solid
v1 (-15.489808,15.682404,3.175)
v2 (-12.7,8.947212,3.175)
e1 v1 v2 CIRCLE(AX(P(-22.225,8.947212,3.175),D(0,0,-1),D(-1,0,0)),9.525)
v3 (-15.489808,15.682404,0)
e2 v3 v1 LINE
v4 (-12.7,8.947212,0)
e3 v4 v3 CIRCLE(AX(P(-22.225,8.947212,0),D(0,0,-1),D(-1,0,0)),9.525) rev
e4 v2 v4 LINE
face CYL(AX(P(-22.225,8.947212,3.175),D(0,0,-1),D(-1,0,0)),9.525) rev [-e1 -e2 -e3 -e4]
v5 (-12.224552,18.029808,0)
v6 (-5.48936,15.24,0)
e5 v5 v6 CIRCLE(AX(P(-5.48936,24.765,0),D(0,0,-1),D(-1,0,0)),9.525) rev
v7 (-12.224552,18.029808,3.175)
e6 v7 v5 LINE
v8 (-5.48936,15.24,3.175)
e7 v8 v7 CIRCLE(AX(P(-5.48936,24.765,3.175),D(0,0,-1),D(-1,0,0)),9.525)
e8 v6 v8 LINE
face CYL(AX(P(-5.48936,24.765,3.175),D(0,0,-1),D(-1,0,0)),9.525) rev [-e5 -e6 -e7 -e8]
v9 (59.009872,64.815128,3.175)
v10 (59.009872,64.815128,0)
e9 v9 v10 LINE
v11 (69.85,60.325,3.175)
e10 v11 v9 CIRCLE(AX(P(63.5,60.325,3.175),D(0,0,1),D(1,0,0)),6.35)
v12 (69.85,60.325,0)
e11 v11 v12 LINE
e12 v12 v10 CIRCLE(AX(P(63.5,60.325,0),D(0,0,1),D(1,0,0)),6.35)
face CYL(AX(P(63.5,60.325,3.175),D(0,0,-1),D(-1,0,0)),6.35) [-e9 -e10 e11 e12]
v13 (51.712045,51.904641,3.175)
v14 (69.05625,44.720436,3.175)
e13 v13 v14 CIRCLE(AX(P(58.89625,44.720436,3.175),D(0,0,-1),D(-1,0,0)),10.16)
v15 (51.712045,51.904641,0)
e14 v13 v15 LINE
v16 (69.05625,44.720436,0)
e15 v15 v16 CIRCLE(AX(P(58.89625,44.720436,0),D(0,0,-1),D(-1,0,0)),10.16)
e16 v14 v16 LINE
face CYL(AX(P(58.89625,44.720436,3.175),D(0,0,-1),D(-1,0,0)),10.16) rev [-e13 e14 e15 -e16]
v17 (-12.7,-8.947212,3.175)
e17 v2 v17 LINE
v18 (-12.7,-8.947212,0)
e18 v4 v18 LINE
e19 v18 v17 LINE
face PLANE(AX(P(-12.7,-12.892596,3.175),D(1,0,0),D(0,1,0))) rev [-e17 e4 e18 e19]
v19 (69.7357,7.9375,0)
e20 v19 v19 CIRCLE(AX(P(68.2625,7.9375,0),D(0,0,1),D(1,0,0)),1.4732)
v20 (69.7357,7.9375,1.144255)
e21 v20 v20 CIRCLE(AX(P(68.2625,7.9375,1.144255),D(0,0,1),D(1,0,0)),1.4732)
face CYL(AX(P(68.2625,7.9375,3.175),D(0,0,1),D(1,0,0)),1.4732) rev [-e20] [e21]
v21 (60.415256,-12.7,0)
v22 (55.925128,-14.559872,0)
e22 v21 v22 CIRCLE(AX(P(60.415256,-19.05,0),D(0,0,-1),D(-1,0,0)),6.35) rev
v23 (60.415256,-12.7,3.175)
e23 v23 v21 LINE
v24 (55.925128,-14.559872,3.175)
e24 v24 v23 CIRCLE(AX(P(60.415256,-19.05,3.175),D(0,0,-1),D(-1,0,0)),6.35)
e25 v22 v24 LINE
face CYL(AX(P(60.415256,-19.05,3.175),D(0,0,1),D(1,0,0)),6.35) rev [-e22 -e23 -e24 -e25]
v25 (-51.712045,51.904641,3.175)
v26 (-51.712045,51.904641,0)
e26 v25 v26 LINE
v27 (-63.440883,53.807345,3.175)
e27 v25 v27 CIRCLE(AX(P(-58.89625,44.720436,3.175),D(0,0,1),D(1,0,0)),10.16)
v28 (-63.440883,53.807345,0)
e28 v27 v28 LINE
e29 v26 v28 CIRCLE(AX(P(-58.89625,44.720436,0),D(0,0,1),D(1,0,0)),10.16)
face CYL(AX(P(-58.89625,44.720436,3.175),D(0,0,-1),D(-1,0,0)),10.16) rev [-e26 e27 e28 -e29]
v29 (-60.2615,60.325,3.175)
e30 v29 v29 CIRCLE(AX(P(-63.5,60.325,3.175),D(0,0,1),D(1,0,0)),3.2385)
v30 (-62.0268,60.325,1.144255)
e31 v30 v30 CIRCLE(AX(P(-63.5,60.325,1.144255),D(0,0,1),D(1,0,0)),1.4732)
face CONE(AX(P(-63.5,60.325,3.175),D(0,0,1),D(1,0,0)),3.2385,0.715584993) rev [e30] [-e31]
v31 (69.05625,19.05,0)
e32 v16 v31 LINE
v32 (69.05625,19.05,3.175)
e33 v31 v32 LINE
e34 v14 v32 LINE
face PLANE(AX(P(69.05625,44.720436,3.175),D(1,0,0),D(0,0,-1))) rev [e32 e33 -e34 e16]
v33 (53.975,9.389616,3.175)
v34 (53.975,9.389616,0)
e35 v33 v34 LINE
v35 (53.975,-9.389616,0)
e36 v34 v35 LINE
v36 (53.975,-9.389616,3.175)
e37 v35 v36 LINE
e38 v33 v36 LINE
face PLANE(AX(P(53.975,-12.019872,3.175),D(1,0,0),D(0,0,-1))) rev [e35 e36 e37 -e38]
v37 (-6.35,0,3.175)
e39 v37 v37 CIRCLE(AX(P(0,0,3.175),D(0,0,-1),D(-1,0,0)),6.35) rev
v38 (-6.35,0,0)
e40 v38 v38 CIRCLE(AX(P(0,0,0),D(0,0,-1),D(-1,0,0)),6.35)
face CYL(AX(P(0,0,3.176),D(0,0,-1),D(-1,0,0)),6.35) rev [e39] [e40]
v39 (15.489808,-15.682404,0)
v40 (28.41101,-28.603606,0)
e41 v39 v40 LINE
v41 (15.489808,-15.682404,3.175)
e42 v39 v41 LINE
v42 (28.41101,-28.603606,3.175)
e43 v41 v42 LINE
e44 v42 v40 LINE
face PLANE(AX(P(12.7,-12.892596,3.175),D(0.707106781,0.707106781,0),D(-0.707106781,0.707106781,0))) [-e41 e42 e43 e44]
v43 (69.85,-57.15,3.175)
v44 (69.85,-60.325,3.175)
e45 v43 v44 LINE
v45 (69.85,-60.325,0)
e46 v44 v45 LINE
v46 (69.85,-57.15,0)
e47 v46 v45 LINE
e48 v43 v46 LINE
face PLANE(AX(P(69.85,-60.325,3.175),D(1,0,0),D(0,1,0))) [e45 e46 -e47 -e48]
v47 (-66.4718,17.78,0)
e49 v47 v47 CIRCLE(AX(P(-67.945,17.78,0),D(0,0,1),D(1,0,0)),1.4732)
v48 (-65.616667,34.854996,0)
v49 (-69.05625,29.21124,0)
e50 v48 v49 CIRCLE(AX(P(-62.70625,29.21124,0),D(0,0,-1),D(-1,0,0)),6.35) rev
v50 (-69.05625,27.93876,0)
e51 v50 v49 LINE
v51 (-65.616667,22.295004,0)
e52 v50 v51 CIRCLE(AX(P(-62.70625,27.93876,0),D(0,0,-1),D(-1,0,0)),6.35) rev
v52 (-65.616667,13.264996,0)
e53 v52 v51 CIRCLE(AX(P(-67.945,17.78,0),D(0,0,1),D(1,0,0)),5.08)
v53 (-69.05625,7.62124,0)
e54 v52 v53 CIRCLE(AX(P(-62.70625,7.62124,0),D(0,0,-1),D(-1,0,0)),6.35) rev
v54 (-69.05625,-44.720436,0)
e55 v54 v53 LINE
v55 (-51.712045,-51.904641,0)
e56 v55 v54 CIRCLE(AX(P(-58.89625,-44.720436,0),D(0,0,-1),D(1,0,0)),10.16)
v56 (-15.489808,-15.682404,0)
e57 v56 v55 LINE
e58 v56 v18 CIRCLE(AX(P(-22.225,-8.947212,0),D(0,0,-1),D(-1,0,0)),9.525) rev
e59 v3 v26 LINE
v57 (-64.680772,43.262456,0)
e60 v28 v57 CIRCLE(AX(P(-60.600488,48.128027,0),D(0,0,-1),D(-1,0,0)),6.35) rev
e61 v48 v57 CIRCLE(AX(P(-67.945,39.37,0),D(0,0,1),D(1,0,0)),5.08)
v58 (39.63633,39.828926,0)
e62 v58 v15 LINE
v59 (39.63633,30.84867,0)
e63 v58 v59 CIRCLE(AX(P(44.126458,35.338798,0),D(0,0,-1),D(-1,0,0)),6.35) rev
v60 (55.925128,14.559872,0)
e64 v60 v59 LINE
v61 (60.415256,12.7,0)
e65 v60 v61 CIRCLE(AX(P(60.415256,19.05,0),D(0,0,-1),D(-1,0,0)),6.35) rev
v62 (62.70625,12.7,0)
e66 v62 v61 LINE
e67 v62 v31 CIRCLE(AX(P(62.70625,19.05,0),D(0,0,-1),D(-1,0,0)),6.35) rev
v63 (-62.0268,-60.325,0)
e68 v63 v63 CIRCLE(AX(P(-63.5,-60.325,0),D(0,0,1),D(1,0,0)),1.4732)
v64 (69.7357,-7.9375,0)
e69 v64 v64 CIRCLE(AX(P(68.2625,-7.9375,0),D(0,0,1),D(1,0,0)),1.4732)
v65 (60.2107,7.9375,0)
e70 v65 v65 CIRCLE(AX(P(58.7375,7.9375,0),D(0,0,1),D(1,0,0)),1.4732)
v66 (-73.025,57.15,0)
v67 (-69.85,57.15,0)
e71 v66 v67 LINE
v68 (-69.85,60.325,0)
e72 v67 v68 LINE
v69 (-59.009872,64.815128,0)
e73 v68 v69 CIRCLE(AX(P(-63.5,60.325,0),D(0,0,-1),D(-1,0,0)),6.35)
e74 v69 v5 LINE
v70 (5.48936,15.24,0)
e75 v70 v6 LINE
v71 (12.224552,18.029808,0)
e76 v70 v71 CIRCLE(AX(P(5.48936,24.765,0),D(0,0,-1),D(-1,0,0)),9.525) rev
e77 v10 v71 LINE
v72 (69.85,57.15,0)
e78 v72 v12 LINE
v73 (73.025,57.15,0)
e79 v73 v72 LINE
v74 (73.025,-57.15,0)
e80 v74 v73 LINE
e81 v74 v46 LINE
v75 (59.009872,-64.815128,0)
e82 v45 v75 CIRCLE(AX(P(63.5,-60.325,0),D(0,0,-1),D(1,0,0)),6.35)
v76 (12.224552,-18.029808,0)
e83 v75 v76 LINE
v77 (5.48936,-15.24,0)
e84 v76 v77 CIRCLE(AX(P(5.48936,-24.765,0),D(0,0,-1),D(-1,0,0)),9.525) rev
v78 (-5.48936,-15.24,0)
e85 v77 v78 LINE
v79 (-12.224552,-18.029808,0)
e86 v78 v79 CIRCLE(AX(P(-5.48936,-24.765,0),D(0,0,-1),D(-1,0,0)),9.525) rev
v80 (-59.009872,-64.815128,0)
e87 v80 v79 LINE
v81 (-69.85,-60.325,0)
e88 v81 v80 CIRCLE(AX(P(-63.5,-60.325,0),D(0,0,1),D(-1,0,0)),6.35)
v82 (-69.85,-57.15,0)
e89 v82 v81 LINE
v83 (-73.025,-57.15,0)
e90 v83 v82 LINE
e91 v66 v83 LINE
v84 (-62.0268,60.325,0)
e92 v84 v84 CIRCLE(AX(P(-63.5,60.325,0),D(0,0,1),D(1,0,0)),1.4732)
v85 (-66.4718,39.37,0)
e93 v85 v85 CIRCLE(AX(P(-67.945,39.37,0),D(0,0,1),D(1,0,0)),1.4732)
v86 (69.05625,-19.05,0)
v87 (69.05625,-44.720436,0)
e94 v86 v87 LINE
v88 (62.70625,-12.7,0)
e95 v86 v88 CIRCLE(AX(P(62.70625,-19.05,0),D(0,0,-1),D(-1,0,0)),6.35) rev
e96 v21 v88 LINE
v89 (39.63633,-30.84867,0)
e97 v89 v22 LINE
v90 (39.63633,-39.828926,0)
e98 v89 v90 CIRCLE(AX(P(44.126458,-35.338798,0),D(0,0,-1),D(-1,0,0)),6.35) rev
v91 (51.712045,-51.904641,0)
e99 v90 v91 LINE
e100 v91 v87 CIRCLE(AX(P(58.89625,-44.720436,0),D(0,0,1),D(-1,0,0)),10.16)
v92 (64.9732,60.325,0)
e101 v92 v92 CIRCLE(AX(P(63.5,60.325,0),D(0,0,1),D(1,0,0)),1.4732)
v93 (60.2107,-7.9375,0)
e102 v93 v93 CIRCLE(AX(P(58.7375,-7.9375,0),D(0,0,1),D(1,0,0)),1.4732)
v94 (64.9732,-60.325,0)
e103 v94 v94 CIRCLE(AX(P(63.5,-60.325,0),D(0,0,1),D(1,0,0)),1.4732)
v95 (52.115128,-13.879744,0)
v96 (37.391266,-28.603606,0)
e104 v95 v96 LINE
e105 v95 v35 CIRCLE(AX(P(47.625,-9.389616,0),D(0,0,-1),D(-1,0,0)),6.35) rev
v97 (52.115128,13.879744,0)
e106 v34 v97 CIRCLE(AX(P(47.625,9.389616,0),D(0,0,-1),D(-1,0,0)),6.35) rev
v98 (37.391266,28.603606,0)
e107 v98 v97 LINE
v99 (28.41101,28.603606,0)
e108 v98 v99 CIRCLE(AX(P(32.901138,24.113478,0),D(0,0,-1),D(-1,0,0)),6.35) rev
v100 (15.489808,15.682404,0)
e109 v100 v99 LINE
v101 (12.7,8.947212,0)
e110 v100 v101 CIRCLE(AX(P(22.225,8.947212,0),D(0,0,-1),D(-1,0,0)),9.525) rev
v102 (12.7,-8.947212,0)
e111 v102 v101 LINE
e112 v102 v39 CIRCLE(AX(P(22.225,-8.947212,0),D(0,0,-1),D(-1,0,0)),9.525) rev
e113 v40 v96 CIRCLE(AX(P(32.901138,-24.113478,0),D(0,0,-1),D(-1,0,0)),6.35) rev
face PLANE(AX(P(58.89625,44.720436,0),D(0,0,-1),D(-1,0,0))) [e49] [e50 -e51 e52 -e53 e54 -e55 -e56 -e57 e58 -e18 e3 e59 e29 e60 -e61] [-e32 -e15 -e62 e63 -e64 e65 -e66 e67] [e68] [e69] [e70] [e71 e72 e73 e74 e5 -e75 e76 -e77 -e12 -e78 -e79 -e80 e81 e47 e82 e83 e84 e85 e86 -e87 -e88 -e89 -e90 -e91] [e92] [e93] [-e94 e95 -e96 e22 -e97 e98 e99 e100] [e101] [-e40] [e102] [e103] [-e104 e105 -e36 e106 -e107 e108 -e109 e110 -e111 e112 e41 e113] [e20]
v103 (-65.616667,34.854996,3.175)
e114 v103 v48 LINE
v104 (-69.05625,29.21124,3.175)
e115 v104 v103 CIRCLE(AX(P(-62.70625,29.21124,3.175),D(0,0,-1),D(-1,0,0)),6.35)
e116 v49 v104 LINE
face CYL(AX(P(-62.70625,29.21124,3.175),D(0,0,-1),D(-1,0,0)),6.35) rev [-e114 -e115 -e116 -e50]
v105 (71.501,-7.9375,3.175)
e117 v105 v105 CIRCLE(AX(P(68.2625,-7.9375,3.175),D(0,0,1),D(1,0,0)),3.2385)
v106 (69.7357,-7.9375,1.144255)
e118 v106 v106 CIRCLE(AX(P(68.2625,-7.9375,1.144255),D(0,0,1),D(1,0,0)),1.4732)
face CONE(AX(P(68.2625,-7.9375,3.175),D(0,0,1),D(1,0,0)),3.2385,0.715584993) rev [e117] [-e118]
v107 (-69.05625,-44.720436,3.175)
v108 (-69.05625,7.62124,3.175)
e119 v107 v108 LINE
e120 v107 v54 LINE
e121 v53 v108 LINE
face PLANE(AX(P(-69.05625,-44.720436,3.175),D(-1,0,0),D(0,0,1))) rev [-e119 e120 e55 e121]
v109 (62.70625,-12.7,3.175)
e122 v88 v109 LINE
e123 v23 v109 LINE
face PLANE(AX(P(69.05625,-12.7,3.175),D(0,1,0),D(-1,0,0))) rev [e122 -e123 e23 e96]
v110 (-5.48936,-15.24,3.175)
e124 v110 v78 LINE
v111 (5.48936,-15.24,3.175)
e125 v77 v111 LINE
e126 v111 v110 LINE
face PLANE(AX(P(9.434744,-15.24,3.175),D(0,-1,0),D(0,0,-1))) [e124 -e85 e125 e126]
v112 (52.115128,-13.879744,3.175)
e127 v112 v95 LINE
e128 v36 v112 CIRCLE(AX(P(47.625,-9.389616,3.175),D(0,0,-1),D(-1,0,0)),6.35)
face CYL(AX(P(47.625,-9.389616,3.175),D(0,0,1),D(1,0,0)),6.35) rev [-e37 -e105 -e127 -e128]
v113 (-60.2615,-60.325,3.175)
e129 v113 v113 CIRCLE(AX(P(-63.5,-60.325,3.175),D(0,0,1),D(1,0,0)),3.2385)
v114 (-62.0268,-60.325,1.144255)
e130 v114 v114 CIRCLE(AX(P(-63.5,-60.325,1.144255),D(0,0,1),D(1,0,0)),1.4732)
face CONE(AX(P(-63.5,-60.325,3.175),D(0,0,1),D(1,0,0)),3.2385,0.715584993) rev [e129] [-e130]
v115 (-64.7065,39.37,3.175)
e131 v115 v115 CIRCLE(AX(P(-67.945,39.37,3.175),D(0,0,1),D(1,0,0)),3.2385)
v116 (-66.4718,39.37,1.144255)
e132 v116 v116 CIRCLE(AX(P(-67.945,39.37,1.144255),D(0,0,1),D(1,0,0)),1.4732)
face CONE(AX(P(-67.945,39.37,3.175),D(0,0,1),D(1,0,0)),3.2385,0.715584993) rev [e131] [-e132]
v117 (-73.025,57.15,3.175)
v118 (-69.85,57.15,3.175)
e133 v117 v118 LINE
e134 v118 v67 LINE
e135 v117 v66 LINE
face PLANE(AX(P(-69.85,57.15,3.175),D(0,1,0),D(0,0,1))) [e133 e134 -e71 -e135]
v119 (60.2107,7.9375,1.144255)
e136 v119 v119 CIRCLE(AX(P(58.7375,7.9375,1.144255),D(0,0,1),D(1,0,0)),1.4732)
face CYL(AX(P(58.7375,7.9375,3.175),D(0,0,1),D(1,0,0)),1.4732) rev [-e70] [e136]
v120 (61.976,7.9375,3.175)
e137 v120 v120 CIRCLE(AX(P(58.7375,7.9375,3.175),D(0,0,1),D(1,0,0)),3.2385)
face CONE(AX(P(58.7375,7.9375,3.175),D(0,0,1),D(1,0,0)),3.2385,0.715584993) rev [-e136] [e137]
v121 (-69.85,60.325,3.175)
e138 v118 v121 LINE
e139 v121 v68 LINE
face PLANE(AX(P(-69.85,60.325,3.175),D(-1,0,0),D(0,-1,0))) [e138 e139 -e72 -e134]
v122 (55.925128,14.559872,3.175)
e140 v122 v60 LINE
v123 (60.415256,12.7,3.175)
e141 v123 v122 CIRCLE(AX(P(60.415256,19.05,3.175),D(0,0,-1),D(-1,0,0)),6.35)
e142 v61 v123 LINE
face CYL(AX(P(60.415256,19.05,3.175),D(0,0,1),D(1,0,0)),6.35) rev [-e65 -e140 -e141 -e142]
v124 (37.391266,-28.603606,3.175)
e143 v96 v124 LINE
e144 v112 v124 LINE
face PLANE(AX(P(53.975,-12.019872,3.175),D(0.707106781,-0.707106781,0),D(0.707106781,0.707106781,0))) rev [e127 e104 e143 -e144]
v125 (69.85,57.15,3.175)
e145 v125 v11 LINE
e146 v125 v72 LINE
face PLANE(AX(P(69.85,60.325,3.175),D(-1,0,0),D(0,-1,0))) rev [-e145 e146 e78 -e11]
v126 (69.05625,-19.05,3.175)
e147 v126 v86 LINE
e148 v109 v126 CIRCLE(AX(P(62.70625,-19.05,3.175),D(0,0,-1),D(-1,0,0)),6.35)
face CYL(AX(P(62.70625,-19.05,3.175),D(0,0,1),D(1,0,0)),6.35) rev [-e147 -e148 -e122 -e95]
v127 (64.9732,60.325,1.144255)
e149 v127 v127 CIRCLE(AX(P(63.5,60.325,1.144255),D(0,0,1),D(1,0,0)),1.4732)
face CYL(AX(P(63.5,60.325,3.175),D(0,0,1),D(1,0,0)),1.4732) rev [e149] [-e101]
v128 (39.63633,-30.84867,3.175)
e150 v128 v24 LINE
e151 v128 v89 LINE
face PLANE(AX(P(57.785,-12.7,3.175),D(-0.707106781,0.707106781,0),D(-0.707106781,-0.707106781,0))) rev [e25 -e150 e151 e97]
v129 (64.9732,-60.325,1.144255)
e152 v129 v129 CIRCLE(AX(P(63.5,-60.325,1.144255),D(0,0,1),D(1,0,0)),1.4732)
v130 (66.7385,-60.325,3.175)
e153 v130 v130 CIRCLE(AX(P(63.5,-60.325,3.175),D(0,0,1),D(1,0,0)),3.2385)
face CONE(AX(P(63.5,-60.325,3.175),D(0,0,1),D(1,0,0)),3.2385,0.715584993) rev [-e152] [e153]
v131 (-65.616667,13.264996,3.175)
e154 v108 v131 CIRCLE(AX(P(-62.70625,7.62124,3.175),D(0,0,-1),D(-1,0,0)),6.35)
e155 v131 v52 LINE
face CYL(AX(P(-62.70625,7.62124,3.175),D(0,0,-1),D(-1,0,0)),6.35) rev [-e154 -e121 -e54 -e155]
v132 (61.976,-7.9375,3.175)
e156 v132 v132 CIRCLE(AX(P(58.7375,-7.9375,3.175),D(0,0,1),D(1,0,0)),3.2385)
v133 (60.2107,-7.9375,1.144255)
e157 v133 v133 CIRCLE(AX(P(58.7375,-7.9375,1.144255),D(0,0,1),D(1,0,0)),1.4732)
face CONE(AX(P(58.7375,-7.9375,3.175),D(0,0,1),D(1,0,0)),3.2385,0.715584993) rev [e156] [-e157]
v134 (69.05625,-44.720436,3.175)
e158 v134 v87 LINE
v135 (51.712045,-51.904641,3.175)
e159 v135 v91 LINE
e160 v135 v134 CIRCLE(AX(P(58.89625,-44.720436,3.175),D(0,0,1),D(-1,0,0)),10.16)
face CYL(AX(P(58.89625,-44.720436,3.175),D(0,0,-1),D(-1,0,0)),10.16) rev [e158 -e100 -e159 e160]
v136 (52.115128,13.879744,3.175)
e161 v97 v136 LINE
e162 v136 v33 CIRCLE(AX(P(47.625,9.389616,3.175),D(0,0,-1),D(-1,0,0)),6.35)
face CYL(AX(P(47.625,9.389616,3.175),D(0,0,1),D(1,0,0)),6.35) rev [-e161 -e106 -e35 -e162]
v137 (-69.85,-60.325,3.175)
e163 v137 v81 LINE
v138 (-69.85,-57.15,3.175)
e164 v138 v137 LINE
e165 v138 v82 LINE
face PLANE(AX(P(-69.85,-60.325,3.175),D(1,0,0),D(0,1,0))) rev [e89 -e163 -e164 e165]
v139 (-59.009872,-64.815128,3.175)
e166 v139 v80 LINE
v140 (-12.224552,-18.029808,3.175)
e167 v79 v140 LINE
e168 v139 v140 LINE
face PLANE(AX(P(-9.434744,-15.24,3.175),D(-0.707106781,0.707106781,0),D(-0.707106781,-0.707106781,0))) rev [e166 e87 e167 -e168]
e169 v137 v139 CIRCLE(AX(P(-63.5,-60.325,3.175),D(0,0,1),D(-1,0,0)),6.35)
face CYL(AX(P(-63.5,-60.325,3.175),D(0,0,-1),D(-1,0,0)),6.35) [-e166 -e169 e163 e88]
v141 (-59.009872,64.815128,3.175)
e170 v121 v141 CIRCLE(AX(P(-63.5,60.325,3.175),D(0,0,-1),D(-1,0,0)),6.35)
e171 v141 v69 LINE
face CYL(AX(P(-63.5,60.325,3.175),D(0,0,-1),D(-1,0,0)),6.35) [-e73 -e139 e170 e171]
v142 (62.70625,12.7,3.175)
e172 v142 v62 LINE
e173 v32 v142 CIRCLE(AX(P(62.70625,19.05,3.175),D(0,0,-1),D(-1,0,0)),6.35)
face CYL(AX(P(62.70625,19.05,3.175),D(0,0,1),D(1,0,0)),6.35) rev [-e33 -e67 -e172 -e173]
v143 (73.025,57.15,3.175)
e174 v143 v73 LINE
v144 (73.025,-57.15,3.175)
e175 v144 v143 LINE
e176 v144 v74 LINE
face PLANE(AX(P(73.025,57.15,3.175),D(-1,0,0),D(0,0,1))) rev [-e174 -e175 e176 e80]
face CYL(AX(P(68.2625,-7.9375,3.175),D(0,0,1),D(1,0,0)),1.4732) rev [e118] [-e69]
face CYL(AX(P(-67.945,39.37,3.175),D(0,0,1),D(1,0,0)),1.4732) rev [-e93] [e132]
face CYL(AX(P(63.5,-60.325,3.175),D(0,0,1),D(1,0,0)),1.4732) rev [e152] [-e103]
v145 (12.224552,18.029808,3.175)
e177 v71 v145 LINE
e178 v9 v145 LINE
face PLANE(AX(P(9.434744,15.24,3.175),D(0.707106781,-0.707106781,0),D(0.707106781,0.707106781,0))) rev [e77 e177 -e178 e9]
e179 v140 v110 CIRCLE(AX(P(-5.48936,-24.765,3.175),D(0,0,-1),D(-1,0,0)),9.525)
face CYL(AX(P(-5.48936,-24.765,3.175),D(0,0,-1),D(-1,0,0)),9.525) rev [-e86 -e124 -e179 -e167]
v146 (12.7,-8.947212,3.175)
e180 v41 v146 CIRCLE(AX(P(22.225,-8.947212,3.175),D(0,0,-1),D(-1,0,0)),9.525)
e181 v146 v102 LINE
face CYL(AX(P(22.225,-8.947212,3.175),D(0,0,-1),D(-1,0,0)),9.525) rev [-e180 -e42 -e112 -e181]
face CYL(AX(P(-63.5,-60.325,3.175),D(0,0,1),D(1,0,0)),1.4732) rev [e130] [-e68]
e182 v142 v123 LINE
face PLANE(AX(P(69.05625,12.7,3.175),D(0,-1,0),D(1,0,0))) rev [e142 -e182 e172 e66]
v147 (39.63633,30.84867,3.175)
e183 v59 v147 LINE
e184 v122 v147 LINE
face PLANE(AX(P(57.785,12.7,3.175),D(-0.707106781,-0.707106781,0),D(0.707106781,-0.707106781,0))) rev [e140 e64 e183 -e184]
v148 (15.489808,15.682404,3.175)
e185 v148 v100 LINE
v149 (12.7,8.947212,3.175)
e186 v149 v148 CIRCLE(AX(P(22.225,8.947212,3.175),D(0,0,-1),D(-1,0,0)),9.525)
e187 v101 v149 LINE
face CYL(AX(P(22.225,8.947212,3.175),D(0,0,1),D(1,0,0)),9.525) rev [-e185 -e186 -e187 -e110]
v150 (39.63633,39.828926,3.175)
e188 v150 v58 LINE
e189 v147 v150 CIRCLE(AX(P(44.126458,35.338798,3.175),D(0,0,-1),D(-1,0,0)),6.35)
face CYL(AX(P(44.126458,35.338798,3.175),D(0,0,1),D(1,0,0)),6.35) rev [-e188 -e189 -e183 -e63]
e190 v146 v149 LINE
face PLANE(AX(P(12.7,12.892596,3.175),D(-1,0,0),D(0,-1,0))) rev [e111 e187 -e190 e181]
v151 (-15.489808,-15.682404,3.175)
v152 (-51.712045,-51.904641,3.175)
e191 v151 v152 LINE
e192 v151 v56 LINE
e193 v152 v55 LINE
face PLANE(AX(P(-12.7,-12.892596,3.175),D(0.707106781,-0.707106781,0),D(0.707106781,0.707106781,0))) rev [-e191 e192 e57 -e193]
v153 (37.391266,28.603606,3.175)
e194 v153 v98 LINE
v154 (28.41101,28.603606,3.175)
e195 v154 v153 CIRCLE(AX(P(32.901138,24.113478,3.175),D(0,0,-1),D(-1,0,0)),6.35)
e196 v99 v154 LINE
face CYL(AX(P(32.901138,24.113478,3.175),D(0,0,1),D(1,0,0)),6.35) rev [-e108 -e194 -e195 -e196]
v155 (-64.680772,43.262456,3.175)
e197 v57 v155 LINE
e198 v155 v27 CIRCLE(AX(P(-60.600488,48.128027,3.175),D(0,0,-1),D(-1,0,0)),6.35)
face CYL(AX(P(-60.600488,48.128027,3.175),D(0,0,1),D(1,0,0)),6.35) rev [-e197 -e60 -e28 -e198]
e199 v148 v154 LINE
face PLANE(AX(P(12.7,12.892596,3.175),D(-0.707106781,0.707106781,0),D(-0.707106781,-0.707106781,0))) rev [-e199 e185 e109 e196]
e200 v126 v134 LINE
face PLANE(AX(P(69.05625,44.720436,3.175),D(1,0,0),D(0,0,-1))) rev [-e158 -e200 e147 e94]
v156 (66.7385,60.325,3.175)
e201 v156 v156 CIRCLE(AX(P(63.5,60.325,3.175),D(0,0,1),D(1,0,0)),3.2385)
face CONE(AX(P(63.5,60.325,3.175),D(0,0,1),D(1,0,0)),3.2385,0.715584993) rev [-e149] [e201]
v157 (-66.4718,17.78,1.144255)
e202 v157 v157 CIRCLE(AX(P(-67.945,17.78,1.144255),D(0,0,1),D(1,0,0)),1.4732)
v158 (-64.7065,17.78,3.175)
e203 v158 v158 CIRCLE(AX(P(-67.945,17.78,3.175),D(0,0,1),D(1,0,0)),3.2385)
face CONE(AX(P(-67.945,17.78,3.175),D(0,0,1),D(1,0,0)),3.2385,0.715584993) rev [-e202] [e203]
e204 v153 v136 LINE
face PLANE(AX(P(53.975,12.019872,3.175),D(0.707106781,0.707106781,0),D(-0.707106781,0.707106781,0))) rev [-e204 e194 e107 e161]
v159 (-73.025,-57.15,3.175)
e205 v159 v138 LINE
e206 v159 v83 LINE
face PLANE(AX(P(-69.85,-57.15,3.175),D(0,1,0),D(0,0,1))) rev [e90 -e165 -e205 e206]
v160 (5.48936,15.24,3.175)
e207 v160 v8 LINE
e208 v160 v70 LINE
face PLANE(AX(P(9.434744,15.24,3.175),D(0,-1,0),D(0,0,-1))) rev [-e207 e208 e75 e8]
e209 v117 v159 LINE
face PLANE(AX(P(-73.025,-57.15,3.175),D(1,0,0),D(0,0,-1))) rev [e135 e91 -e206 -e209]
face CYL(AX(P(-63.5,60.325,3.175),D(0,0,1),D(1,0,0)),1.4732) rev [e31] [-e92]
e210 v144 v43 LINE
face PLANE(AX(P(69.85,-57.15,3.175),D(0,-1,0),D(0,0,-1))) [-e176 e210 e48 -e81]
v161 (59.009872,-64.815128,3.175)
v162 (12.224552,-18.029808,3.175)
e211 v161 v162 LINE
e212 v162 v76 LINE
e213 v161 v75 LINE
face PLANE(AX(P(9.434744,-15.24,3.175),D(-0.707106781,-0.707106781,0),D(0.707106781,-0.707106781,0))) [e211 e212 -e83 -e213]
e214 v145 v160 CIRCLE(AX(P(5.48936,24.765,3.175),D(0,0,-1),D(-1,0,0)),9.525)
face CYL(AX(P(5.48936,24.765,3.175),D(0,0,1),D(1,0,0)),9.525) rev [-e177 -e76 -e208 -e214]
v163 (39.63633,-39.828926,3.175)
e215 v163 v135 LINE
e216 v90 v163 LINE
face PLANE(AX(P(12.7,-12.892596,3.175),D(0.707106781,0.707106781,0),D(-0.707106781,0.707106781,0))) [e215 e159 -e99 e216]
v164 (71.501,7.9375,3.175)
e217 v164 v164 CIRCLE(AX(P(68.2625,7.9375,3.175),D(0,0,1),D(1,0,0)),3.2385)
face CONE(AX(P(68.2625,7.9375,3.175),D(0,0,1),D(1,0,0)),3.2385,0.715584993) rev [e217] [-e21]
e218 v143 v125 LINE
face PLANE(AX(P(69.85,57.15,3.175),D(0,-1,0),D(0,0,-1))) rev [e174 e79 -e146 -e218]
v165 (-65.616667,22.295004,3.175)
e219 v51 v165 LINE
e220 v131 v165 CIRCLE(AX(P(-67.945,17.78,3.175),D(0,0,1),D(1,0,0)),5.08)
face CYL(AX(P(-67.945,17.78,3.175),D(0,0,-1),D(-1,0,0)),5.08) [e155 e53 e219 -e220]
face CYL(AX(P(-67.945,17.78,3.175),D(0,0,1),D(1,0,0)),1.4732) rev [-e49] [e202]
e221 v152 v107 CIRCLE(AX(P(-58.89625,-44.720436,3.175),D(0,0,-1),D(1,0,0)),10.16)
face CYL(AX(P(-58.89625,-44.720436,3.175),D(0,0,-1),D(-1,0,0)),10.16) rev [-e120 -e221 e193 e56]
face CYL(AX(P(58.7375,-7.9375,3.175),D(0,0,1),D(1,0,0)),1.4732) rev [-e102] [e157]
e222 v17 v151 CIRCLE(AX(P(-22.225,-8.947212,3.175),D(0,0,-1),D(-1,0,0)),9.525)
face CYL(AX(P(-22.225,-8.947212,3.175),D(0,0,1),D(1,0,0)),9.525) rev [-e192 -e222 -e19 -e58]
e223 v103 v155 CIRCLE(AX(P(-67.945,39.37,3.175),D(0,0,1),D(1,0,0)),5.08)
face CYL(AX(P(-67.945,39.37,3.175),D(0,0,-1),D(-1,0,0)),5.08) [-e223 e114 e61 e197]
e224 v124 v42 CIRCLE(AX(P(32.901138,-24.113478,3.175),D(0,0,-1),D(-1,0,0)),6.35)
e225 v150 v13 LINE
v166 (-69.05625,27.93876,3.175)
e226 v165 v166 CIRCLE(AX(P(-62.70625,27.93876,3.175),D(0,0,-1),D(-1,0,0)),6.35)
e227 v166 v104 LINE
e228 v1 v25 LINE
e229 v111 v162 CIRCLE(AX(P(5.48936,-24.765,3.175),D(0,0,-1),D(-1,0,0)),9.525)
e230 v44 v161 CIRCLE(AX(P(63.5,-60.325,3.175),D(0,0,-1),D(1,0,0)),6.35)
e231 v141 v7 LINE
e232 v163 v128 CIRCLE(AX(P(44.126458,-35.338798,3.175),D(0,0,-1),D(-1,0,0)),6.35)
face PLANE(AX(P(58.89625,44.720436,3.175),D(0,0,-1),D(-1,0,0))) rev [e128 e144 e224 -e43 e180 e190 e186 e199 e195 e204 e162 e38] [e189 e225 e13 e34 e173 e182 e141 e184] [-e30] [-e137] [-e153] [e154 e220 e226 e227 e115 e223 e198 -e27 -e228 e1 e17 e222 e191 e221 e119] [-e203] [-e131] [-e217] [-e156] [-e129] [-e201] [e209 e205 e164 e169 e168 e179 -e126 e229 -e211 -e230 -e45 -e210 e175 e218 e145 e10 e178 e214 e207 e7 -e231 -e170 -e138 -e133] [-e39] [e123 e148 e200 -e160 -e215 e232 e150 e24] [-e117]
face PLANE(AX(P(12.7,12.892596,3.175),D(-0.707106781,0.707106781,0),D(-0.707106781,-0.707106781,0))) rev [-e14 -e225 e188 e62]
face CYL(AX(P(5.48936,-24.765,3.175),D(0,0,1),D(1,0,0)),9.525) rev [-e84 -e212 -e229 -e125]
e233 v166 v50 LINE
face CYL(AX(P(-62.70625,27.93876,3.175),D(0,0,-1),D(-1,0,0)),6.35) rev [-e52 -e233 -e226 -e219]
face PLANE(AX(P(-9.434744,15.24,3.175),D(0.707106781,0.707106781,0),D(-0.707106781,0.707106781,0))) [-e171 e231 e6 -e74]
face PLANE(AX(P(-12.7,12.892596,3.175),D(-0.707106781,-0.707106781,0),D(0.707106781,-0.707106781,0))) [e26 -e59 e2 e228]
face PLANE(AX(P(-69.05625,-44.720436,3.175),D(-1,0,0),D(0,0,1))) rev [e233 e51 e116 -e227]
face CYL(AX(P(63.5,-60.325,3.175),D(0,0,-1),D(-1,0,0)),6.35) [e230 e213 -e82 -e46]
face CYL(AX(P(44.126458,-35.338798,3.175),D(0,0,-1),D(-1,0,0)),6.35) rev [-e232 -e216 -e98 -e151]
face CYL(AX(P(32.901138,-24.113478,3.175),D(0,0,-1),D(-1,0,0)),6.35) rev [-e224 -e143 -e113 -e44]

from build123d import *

# Parameters (mm, degrees)
BOSS_EXTRUDE1_DEPTH                           = 3.175
MIRROR2_COPY_1_DEPTH                          = 3.175
MIRROR2_COPY_3_DEPTH                          = 3.175
INTERNAL_SHARPS_R                             = 9.525
BRAKE_MOUNT_DEPTH                             = 3.175
FILLET1_R                                     = 6.35
BEARING_POCKET_REACH                          = 100.936
SKETCH6_R                                     = 6.35
IMU_MOUNTING_DEPTH                            = 3.175
IMU_MOUNTING_HOLES_AT_2_COUNT                 = 2
IMU_MOUNTING_HOLES_AT_2_PITCH                 = 21.59
FILLET4_R                                     = 6.35
CSK_FOR_4_FLAT_HEAD_MACHINE_SCREW2_AT_2_COUNT = 2
CSK_FOR_4_FLAT_HEAD_MACHINE_SCREW2_AT_2_PITCH = 15.875
CSK_FOR_4_FLAT_HEAD_MACHINE_SCREW2_AT_3_COUNT = 2
CSK_FOR_4_FLAT_HEAD_MACHINE_SCREW2_AT_3_PITCH = 18.513272266
CSK_FOR_4_FLAT_HEAD_MACHINE_SCREW2_AT_4_COUNT = 2
CSK_FOR_4_FLAT_HEAD_MACHINE_SCREW2_AT_4_PITCH = 9.525


with BuildPart() as part:
    # Sketch1 → Boss-Extrude1 (new body)
    with BuildSketch(Plane.XY):
        with BuildLine():
            Line((9.434743879, 15.24), (0, 15.24))
            Line((0, 15.24), (0, 0))
            Line((0, 0), (12.7, 0))
            Line((12.7, 0), (12.7, 12.892596045))
            Line((12.7, 12.892596045), (51.712045103, 51.904641149))
            ThreePointArc((51.712045103, 51.904641149), (62.784313673, 54.107052302), (69.05625, 44.720436252))
            Line((69.05625, 44.720436252), (69.05625, 0))
            Line((69.05625, 0), (73.025, 0))
            Line((73.025, 0), (73.025, 57.15))
            Line((73.025, 57.15), (69.85, 57.15))
            Line((69.85, 57.15), (69.85, 60.325))
            ThreePointArc((69.85, 60.325), (65.930039796, 66.191635031), (59.009871939, 64.815128061))
            Line((59.009871939, 64.815128061), (9.434743879, 15.24))
        make_face()
    boss_extrude1 = extrude(amount=BOSS_EXTRUDE1_DEPTH)

    # Sketch11 → CSK for #4 Flat Head Machine Screw1 (revolve, cut)
    with BuildSketch(Plane(origin=(63.5, 60.325, 3.175), x_dir=(0, -1, 0), z_dir=(1, 0, 0))):
        Polygon((0, 0), (0, 3.175), (1.4732, 3.175), (1.4732, 2.030745349), (3.2385, 0), align=None)
    csk_for_4_flat_head_machine_screw1 = revolve(axis=Axis((63.5, 60.325, 9.525), (0, 0, -1)), mode=Mode.SUBTRACT)

    # Mirror1: Boss-Extrude1, CSK for #4 Flat Head Machine Screw1 across plane
    add(boss_extrude1.mirror(Plane.ZX))
    add(csk_for_4_flat_head_machine_screw1.mirror(Plane.ZX), mode=Mode.SUBTRACT)

    # Mirror2 copy 1 sketch → Mirror2 copy 1 (add)
    with BuildSketch(Plane(origin=(0, 0, 0), x_dir=(-1, 0, 0), z_dir=(0, 0, 1))):
        with BuildLine():
            Line((9.434743879, 15.24), (0, 15.24))
            Line((0, 15.24), (0, 0))
            Line((0, 0), (12.7, 0))
            Line((12.7, 0), (12.7, 12.892596045))
            Line((12.7, 12.892596045), (51.712045103, 51.904641149))
            ThreePointArc((51.712045103, 51.904641149), (62.784313673, 54.107052302), (69.05625, 44.720436252))
            Line((69.05625, 44.720436252), (69.05625, 0))
            Line((69.05625, 0), (73.025, 0))
            Line((73.025, 0), (73.025, 57.15))
            Line((73.025, 57.15), (69.85, 57.15))
            Line((69.85, 57.15), (69.85, 60.325))
            ThreePointArc((69.85, 60.325), (65.930039796, 66.191635031), (59.009871939, 64.815128061))
            Line((59.009871939, 64.815128061), (9.434743879, 15.24))
        make_face()
    extrude(amount=MIRROR2_COPY_1_DEPTH)

    # Mirror2 copy 2 sketch → Mirror2 copy 2 (revolve, cut)
    with BuildSketch(Plane(origin=(-63.5, -60.325, 3.175), x_dir=(0, 1, 0), z_dir=(-1, 0, 0))):
        Polygon((0, 0), (0, 3.175), (1.4732, 3.175), (1.4732, 2.030745349), (3.2385, 0), align=None)
    revolve(axis=Axis((-63.5, -60.325, 9.525), (0, 0, -1)), mode=Mode.SUBTRACT)

    # Mirror2 copy 3 sketch → Mirror2 copy 3 (add)
    with BuildSketch(Plane(origin=(0, 0, 0), x_dir=(-1, 0, 0), z_dir=(0, 0, 1))):
        with BuildLine():
            Line((9.434743879, -15.24), (0, -15.24))
            Line((0, -15.24), (0, 0))
            Line((0, 0), (12.7, 0))
            Line((12.7, 0), (12.7, -12.892596045))
            Line((12.7, -12.892596045), (51.712045103, -51.904641149))
            ThreePointArc((51.712045103, -51.904641149), (62.784313673, -54.107052302), (69.05625, -44.720436252))
            Line((69.05625, -44.720436252), (69.05625, 0))
            Line((69.05625, 0), (73.025, 0))
            Line((73.025, 0), (73.025, -57.15))
            Line((73.025, -57.15), (69.85, -57.15))
            Line((69.85, -57.15), (69.85, -60.325))
            ThreePointArc((69.85, -60.325), (65.930039796, -66.191635031), (59.009871939, -64.815128061))
            Line((59.009871939, -64.815128061), (9.434743879, -15.24))
        make_face()
    extrude(amount=MIRROR2_COPY_3_DEPTH)

    # Mirror2 copy 4 sketch → Mirror2 copy 4 (revolve, cut)
    with BuildSketch(Plane(origin=(-63.5, 60.325, 3.175), x_dir=(0, -1, 0), z_dir=(-1, 0, 0))):
        Polygon((0, 0), (0, -3.175), (1.4732, -3.175), (1.4732, -2.030745349), (3.2385, 0), align=None)
    revolve(axis=Axis((-63.5, 60.325, 9.525), (0, 0, 1)), mode=Mode.SUBTRACT)

    # INTERNAL-SHARPS
    internal_sharps_edges = [part.edges().sort_by_distance(p)[0] for p in [
        (9.434743879, 15.24, 1.5875),
        (-9.434743879, 15.24, 1.5875),
        (12.7, -12.892596045, 1.5875),
        (12.7, 12.892596045, 1.5875),
        (9.434743879, -15.24, 1.5875),
        (-9.434743879, -15.24, 1.5875),
        (-12.7, -12.892596045, 1.5875),
        (-12.7, 12.892596045, 1.5875),
    ]]
    fillet(internal_sharps_edges, radius=INTERNAL_SHARPS_R)

    # Sketch5 → BRAKE-MOUNT (add)
    with BuildSketch(Plane.XY):
        Polygon((69.05625, 12.7), (57.785, 12.7), (35.146201977, 35.338798023), (32.901137947, 33.093733992), (53.975, 12.019871939), (53.975, -12.019871939), (32.901137947, -33.093733992), (35.146201977, -35.338798023), (57.785, -12.7), (69.05625, -12.7), align=None)
    extrude(amount=BRAKE_MOUNT_DEPTH)

    # Fillet1
    fillet1_edges = [part.edges().sort_by_distance(p)[0] for p in [
        (69.05625, -12.7, 1.5875),
        (57.785, -12.7, 1.5875),
        (35.146201977, -35.338798023, 1.5875),
        (32.901137947, -33.093733992, 1.5875),
        (53.975, -12.019871939, 1.5875),
        (53.975, 12.019871939, 1.5875),
        (32.901137947, 33.093733992, 1.5875),
        (35.146201977, 35.338798023, 1.5875),
        (57.785, 12.7, 1.5875),
        (69.05625, 12.7, 1.5875),
    ]]
    fillet(fillet1_edges, radius=FILLET1_R)

    # Sketch6 → BEARING-POCKET (cut, up to next)
    with BuildSketch(Plane(origin=(0, 0, 0), x_dir=(-1, 0, 0), z_dir=(0, 0, -1)), mode=Mode.PRIVATE) as bearing_pocket_sk1:
        Circle(SKETCH6_R)
    bearing_pocket_tool1 = extrude(bearing_pocket_sk1.sketch, amount=-BEARING_POCKET_REACH, mode=Mode.PRIVATE) & part.part
    add(bearing_pocket_tool1.solids().sort_by_distance((0, 0, 0))[0], mode=Mode.SUBTRACT)

    # Sketch13 → IMU-MOUNTING (add)
    with BuildSketch(Plane.XY):
        with BuildLine():
            Line((-73.025, 44.45), (-73.025, 12.7))
            Line((-73.025, 12.7), (-67.945, 12.7))
            ThreePointArc((-67.945, 12.7), (-62.895851895, 18.339020045), (-69.05625, 22.736967161))
            Line((-69.05625, 22.736967161), (-69.05625, 34.413032839))
            ThreePointArc((-69.05625, 34.413032839), (-62.895851895, 38.810979955), (-67.945, 44.45))
            Line((-67.945, 44.45), (-73.025, 44.45))
        make_face()
    extrude(amount=IMU_MOUNTING_DEPTH)

    # Sketch15 → IMU-MOUNTING-HOLES (revolve, cut)
    with BuildSketch(Plane(origin=(-67.945, 17.78, 3.175), x_dir=(0, -1, 0), z_dir=(1, 0, 0))):
        Polygon((0, 0), (0, 3.175), (1.4732, 3.175), (1.4732, 2.030745349), (3.2385, 0), align=None)
    imu_mounting_holes = revolve(axis=Axis((-67.945, 17.78, 9.525), (0, 0, -1)), mode=Mode.SUBTRACT)

    # IMU-MOUNTING-HOLES at 2: IMU-MOUNTING-HOLES ×2
    with Locations(*[(0, i * IMU_MOUNTING_HOLES_AT_2_PITCH, 0) for i in range(1, IMU_MOUNTING_HOLES_AT_2_COUNT)]):
        add(imu_mounting_holes, mode=Mode.SUBTRACT)

    # Fillet4
    fillet4_edges = [part.edges().sort_by_distance(p)[0] for p in [
        (-69.05625, 44.45, 1.5875),
        (-69.05625, 12.7, 1.5875),
        (-69.05625, 22.736967161, 1.5875),
        (-69.05625, 34.413032839, 1.5875),
    ]]
    fillet(fillet4_edges, radius=FILLET4_R)

    # Sketch17 → CSK for #4 Flat Head Machine Screw2 (revolve, cut)
    with BuildSketch(Plane(origin=(58.7375, -7.9375, 3.175), x_dir=(0, -1, 0), z_dir=(1, 0, 0))):
        Polygon((0, 0), (0, 3.175), (1.4732, 3.175), (1.4732, 2.030745349), (3.2385, 0), align=None)
    csk_for_4_flat_head_machine_screw2 = revolve(axis=Axis((58.7375, -7.9375, 9.525), (0, 0, -1)), mode=Mode.SUBTRACT)

    # CSK for #4 Flat Head Machine Screw2 at 2: CSK for #4 Flat Head Machine Screw2 ×2
    with Locations(*[(0, i * CSK_FOR_4_FLAT_HEAD_MACHINE_SCREW2_AT_2_PITCH, 0) for i in range(1, CSK_FOR_4_FLAT_HEAD_MACHINE_SCREW2_AT_2_COUNT)]):
        add(csk_for_4_flat_head_machine_screw2, mode=Mode.SUBTRACT)

    # CSK for #4 Flat Head Machine Screw2 at 3: CSK for #4 Flat Head Machine Screw2 ×2
    with Locations(*[Vector(0.5144957554275265, 0.8574929257125442, 0) * (i * CSK_FOR_4_FLAT_HEAD_MACHINE_SCREW2_AT_3_PITCH) for i in range(1, CSK_FOR_4_FLAT_HEAD_MACHINE_SCREW2_AT_3_COUNT)]):
        add(csk_for_4_flat_head_machine_screw2, mode=Mode.SUBTRACT)

    # CSK for #4 Flat Head Machine Screw2 at 4: CSK for #4 Flat Head Machine Screw2 ×2
    with Locations(*[(i * CSK_FOR_4_FLAT_HEAD_MACHINE_SCREW2_AT_4_PITCH, 0, 0) for i in range(1, CSK_FOR_4_FLAT_HEAD_MACHINE_SCREW2_AT_4_COUNT)]):
        add(csk_for_4_flat_head_machine_screw2, mode=Mode.SUBTRACT)


solid = part.part
